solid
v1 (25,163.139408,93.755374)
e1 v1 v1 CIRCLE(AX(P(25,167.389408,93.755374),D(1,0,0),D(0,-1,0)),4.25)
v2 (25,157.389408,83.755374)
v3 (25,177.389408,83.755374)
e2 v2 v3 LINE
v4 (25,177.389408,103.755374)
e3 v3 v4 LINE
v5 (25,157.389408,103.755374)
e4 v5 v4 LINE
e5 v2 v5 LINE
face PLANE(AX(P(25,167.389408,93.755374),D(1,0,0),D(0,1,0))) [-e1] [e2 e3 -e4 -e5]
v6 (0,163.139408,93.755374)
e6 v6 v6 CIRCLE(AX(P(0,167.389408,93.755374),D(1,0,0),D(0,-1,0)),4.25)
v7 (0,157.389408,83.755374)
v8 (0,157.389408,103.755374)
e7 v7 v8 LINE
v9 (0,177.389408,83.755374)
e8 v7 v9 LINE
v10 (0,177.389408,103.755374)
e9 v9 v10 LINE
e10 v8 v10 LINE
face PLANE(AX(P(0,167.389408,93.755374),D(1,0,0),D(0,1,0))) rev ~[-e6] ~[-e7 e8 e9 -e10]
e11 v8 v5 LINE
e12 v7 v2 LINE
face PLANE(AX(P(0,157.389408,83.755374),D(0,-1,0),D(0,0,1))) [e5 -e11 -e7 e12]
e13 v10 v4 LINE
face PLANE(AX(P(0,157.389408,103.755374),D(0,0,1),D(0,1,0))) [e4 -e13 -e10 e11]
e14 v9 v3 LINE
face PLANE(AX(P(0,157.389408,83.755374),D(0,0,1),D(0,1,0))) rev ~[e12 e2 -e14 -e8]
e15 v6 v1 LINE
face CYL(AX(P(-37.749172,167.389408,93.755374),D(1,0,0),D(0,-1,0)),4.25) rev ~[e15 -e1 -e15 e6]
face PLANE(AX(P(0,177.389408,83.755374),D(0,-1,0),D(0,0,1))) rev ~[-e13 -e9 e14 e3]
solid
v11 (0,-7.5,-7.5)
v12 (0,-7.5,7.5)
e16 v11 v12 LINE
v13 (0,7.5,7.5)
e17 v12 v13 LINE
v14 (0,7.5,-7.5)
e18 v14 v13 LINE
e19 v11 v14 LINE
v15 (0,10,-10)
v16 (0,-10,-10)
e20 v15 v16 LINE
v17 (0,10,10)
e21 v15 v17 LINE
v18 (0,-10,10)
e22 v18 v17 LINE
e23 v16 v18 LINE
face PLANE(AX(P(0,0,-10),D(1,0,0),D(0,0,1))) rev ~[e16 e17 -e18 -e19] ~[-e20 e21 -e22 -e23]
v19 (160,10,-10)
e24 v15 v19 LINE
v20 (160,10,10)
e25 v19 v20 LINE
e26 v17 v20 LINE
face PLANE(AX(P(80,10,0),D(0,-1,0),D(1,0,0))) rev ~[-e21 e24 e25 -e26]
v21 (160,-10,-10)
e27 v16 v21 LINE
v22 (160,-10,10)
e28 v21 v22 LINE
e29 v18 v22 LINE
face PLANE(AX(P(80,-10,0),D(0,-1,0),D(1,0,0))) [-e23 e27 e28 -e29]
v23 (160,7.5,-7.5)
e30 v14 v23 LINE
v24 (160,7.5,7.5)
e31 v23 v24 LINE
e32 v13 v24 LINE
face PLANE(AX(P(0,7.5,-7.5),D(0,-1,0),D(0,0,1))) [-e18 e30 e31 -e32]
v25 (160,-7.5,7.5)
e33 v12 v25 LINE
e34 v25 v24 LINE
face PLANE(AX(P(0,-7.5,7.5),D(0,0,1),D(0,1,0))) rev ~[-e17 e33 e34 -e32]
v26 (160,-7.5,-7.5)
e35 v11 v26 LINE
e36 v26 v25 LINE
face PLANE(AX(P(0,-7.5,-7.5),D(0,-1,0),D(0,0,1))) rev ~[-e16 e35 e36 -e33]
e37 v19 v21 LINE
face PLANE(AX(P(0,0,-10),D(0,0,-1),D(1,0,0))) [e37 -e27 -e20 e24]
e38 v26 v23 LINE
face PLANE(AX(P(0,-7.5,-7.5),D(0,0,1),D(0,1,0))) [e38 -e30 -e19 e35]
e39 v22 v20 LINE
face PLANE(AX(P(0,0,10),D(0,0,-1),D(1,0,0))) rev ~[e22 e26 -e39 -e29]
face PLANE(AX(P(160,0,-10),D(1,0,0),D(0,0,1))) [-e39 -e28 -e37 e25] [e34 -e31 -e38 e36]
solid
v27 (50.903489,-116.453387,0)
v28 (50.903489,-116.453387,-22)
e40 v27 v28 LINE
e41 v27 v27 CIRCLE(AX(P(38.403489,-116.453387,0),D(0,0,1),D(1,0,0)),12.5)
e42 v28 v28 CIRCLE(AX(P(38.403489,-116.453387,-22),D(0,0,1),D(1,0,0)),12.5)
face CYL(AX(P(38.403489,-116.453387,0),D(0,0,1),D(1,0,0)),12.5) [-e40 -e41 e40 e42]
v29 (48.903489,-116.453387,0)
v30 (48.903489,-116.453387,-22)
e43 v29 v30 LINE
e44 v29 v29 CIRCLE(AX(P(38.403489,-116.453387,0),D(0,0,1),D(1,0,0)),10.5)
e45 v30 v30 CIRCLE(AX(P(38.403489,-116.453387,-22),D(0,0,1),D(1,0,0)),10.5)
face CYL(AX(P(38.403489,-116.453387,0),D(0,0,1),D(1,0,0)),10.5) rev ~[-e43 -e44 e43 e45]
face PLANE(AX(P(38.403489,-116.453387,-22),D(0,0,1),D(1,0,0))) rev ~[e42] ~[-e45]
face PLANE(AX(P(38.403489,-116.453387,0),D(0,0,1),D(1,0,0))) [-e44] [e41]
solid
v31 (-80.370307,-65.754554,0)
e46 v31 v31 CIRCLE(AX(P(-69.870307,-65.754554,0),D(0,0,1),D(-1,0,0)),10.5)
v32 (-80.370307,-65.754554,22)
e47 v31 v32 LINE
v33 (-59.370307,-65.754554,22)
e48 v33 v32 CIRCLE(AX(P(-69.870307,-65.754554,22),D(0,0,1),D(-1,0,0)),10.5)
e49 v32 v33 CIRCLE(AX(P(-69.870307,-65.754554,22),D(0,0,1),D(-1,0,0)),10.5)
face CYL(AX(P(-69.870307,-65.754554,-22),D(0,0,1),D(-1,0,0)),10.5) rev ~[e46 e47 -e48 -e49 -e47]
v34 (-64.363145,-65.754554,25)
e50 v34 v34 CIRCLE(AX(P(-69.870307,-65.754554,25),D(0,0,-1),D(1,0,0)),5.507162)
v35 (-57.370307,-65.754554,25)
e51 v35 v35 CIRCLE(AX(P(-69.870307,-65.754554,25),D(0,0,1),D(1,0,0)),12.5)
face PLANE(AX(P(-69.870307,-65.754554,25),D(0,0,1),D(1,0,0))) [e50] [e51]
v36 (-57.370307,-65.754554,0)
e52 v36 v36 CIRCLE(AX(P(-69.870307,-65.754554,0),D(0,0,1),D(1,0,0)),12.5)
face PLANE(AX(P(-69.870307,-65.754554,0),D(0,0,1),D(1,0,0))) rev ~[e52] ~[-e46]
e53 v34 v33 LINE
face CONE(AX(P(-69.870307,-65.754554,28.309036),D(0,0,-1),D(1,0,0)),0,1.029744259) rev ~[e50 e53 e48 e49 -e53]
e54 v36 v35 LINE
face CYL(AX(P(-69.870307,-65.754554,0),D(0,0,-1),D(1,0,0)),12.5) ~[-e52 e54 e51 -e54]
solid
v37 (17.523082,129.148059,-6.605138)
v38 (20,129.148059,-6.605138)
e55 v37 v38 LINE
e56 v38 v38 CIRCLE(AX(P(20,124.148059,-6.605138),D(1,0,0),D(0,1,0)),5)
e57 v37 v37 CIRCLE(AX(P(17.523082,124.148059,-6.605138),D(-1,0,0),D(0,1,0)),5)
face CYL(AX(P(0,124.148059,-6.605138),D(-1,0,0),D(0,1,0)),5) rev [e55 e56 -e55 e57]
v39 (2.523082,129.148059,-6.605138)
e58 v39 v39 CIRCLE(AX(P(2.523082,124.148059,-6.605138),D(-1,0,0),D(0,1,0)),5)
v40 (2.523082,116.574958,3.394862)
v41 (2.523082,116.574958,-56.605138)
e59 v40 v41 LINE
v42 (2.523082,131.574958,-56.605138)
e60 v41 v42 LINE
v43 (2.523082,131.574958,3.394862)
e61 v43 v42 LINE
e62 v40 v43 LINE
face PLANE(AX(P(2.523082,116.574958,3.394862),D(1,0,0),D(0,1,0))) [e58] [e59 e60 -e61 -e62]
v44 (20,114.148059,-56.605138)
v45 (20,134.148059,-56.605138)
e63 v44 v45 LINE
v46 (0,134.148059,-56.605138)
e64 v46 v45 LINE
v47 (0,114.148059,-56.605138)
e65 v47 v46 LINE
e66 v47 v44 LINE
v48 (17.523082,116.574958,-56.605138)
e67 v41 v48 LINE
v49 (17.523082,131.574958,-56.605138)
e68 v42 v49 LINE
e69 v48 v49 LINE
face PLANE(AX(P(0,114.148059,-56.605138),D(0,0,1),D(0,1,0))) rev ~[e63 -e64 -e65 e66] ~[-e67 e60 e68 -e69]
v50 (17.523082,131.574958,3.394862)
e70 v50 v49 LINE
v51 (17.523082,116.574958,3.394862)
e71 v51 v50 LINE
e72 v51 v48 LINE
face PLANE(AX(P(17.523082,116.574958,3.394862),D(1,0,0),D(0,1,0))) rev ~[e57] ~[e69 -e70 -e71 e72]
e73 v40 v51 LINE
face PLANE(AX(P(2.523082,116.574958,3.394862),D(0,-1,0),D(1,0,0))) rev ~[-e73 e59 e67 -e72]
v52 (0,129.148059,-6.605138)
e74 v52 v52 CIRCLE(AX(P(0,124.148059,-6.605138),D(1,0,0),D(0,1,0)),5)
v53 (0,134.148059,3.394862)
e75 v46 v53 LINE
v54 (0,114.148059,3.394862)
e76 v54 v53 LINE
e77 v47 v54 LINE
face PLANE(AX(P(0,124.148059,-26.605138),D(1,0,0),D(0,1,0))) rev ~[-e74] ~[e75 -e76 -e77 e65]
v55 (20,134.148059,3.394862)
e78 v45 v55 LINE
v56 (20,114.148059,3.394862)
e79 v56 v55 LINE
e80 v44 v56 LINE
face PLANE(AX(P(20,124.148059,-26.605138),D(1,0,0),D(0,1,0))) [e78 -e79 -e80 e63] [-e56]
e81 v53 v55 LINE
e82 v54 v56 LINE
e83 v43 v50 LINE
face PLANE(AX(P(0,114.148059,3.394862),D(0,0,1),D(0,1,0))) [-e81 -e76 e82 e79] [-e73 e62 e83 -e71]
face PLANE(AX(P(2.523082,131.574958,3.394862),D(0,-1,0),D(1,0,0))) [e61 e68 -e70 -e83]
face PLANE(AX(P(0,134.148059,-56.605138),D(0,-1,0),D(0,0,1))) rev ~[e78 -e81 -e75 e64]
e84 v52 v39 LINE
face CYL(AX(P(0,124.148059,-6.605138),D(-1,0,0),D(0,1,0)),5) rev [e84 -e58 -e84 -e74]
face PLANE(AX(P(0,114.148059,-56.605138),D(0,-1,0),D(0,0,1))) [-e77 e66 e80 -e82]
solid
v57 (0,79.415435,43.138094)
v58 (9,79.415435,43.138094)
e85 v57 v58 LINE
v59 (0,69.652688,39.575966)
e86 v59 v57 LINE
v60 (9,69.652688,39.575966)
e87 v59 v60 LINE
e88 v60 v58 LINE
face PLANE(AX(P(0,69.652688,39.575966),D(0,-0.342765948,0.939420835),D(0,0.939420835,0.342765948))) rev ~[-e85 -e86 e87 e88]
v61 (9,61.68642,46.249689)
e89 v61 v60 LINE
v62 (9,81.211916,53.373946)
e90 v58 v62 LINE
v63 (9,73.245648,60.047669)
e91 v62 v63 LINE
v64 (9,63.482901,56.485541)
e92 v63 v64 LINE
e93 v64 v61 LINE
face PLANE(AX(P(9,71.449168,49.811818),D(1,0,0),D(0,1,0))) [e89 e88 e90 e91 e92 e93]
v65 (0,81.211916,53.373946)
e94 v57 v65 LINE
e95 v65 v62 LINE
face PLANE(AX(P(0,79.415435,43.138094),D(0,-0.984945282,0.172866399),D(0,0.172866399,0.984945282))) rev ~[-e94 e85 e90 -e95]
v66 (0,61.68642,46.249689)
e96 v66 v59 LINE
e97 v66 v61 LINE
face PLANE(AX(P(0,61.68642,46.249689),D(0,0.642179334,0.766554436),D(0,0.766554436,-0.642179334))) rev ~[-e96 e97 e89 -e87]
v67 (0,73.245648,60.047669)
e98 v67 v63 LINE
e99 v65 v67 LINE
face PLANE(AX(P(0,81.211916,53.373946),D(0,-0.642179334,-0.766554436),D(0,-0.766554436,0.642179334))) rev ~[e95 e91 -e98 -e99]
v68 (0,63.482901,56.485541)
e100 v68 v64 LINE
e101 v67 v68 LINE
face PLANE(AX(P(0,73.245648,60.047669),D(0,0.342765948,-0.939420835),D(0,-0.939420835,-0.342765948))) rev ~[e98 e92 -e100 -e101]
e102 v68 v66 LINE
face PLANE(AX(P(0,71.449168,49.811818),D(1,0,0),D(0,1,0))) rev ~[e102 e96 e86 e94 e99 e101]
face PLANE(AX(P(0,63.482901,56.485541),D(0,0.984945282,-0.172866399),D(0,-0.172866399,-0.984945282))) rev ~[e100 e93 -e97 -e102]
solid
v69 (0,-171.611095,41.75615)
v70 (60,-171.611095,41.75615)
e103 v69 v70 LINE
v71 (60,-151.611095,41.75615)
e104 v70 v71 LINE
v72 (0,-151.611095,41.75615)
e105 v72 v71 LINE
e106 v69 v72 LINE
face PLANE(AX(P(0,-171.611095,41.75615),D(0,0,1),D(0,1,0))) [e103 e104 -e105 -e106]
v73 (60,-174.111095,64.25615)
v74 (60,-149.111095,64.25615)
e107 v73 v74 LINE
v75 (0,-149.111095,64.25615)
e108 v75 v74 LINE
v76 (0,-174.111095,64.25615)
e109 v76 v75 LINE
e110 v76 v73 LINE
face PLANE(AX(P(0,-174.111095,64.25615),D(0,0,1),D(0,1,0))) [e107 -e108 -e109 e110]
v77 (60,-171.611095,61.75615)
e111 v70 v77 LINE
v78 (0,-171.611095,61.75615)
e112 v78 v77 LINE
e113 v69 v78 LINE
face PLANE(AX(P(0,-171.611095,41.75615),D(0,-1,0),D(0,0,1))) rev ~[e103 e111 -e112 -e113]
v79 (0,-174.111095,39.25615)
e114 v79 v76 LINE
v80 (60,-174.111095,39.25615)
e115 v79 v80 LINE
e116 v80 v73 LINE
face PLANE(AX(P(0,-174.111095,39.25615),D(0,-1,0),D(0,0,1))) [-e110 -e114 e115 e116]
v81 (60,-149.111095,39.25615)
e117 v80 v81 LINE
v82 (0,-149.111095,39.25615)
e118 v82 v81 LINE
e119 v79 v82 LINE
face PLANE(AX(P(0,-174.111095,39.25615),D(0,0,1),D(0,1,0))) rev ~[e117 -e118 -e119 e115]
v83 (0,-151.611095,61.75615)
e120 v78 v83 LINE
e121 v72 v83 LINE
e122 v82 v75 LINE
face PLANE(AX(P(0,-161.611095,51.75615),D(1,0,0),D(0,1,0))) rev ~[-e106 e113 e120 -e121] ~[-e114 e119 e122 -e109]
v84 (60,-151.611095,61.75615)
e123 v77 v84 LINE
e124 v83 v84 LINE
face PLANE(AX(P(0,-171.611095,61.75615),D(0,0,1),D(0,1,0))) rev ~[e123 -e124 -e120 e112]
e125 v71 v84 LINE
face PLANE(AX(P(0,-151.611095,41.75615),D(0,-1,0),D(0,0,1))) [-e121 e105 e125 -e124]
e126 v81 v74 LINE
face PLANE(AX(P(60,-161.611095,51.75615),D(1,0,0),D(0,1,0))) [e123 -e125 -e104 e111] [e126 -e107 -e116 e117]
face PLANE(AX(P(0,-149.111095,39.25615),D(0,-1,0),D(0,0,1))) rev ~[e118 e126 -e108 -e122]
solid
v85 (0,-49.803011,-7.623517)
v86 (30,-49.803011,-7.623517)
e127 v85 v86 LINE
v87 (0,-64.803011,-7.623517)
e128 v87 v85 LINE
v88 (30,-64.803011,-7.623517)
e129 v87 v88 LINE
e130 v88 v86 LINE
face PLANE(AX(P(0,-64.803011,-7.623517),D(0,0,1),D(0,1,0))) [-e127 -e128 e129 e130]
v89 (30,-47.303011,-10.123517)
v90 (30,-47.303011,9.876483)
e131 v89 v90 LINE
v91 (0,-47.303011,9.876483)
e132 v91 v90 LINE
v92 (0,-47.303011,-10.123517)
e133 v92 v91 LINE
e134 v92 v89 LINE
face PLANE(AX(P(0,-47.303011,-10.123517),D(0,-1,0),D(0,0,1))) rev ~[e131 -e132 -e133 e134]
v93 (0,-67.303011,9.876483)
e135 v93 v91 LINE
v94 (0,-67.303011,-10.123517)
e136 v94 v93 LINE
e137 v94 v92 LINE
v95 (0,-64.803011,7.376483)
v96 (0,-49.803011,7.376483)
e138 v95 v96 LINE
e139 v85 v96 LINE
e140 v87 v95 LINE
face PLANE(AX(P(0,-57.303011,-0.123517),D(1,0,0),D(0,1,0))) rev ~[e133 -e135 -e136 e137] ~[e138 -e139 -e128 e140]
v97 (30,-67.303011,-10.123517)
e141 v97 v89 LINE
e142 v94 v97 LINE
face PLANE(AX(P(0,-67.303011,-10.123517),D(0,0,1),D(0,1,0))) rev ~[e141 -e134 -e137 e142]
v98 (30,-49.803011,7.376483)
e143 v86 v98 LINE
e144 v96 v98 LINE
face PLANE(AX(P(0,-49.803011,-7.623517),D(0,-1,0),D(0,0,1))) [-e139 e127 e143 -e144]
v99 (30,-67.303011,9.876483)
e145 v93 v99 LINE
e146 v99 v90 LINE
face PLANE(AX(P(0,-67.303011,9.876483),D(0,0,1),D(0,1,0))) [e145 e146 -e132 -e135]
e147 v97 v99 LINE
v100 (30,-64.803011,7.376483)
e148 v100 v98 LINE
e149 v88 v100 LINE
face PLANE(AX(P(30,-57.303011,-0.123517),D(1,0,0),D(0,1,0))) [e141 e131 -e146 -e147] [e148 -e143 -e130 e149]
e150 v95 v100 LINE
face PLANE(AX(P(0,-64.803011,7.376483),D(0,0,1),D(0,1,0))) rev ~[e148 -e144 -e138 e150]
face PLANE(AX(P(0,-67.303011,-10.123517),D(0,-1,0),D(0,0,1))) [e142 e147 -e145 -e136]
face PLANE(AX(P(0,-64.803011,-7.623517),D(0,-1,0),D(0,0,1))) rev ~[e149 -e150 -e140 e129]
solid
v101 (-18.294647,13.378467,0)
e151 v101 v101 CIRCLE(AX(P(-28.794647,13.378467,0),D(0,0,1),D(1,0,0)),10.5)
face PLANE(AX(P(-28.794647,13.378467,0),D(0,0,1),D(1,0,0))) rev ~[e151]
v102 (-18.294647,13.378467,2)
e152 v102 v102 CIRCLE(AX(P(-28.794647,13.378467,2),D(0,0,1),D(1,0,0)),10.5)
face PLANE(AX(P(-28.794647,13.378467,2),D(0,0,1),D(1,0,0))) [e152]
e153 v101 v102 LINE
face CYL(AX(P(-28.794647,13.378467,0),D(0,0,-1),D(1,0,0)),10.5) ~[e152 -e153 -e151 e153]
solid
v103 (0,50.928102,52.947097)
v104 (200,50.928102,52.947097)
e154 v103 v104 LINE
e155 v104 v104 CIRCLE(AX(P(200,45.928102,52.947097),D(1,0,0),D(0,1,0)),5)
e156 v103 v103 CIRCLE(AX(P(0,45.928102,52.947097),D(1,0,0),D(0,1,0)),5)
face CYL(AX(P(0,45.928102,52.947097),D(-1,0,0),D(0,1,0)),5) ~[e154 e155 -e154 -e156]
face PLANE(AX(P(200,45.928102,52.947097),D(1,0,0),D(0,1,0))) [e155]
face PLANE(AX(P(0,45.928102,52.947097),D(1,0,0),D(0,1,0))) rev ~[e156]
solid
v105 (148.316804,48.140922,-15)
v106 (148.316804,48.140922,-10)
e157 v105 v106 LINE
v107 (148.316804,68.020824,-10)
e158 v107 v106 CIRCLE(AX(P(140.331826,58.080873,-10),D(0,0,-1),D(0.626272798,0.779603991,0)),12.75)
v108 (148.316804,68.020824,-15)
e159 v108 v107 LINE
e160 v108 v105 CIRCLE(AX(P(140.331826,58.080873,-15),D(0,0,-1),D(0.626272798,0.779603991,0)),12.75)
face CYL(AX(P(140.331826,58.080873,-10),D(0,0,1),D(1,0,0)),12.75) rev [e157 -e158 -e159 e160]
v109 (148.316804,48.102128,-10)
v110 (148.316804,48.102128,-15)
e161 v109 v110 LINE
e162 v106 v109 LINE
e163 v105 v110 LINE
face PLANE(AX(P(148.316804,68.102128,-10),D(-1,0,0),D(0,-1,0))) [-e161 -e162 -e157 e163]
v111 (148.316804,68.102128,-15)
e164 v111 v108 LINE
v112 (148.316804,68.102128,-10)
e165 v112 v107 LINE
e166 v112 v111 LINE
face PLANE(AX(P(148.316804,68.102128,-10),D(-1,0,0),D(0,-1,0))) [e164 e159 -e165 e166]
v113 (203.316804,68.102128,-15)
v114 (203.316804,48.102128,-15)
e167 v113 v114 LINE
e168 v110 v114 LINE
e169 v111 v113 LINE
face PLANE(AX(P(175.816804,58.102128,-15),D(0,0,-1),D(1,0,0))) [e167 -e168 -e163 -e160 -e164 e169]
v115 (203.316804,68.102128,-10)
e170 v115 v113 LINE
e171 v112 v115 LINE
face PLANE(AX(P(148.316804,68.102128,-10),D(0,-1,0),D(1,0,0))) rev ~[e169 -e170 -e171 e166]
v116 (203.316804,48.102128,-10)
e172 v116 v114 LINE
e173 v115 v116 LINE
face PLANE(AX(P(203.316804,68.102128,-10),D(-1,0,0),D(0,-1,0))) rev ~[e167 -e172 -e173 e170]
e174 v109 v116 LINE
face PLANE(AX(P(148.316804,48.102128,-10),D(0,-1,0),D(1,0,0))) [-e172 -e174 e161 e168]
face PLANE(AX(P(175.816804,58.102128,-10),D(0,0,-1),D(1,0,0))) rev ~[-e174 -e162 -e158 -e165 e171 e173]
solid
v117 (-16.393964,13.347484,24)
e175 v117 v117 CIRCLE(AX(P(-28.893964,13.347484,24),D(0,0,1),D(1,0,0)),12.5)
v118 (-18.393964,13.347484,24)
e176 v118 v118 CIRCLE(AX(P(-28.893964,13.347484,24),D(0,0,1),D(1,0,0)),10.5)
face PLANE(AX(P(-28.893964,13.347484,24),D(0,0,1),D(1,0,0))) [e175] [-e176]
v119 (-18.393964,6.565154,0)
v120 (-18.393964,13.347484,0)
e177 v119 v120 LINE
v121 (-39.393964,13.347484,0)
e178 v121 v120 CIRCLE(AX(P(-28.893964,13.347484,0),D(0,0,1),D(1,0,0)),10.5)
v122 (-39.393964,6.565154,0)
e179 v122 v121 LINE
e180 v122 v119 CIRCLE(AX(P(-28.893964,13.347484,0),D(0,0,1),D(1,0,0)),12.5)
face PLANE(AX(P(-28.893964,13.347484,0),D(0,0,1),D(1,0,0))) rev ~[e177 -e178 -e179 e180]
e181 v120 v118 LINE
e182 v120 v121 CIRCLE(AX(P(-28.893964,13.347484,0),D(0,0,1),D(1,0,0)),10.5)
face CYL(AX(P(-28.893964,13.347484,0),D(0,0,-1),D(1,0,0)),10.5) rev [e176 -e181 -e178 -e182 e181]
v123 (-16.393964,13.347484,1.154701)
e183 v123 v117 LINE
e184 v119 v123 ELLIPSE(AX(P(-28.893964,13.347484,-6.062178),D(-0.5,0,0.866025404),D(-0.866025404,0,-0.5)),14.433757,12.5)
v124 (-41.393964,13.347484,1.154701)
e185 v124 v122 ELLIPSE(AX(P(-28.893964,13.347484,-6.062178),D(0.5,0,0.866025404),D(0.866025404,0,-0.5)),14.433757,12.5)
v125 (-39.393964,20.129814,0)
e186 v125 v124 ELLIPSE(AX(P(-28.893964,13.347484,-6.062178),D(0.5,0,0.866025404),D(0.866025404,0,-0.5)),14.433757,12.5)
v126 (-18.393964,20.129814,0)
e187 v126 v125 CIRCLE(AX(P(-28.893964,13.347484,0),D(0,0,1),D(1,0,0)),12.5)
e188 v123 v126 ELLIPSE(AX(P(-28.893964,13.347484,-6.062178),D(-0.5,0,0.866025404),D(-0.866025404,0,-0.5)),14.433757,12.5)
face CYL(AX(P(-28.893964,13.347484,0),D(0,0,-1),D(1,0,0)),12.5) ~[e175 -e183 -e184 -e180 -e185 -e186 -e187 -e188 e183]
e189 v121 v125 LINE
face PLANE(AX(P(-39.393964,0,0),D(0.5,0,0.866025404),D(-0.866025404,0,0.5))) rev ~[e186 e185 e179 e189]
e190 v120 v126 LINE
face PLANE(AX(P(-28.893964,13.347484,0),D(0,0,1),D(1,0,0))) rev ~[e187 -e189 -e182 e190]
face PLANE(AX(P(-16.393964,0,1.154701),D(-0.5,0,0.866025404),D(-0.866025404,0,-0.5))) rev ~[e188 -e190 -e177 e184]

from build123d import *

# Parameters (mm, degrees)
F0_W      = 160
F0_H      = 20
F1_DEPTH  = 10
F2_W      = 25
F2_H      = 25
F2_W_2    = 20
F2_H_2    = 20
F3_DEPTH  = 60
F4_W      = 15
F4_H      = 15
F5_DEPTH  = 160
F6_W      = 20
F6_H      = 20
F6_W_2    = 15
F6_H_2    = 15
F7_DEPTH  = 30
F8_R      = 12.5
F8_R_2    = 10.5
F9_DEPTH  = 22
F10_R     = 12.5
F10_R_2   = 10.5
F11_DEPTH = 24
F12_R     = 12.5
F13_DEPTH = 25
F14_D     = 21
F14_DEPTH = 22
F14_TIP   = 6.3090364998
F15_W     = 55
F15_H     = 20
F16_DEPTH = 5
F17_W     = 20
F17_H     = 60
F17_R     = 5
F18_DEPTH = 20
F19_W     = 20
F19_H     = 20
F20_DEPTH = 25
F21_D     = 8.5
F22_R     = 5
F23_DEPTH = 200
F25_DEPTH = 9
F27_DEPTH = 25
F29_DEPTH = 25
F30_R     = 10.5
F31_DEPTH = 2
F32_W     = 15
F32_H     = 15
F33_DEPTH = 60
F34_R     = 12.75
F35_DEPTH = 5


# Not quite as in the source:
# - a feature names something its author has since deleted; it is built from what else it names


with BuildPart() as f1:
    # F0 (on Front) → F1 (new body, symmetric)
    with BuildSketch(Plane.XZ):
        with Locations((80, 0)):
            Rectangle(F0_W, F0_H)
    extrude(amount=F1_DEPTH, both=True)

    # F4 (on Right) → F5 (cut)
    with BuildSketch(Plane.YZ):
        Rectangle(F4_W, F4_H)
    extrude(amount=F5_DEPTH, mode=Mode.SUBTRACT)


with BuildPart() as f3:
    # F2 (on Right) → F3 (new body)
    with BuildSketch(Plane.YZ):
        with Locations((-161.6110950708, 51.756149815)):
            Rectangle(F2_W, F2_H)
        with Locations((-161.6110950708, 51.756149815)):
            Rectangle(F2_W_2, F2_H_2, mode=Mode.SUBTRACT)
    extrude(amount=F3_DEPTH)


with BuildPart() as f7:
    # F6 (on Right) → F7 (new body)
    with BuildSketch(Plane.YZ):
        with Locations((-57.3030114174, -0.1235169003)):
            Rectangle(F6_W, F6_H)
        with Locations((-57.3030114174, -0.1235169003)):
            Rectangle(F6_W_2, F6_H_2, mode=Mode.SUBTRACT)
    extrude(amount=F7_DEPTH)


with BuildPart() as f9:
    # F8 (on Top) → F9 (new body)
    with BuildSketch(Plane.XY):
        with Locations((38.4034886956, -116.4533868432)):
            Circle(F8_R)
        with Locations((38.4034886956, -116.4533868432)):
            Circle(F8_R_2, mode=Mode.SUBTRACT)
    extrude(amount=-F9_DEPTH)


with BuildPart() as f11:
    # F10 (on Top) → F11 (new body)
    with BuildSketch(Plane.XY):
        with Locations((-28.8939643651, 13.3474841714)):
            Circle(F10_R)
        with Locations((-28.8939643651, 13.3474841714)):
            Circle(F10_R_2, mode=Mode.SUBTRACT)
    extrude(amount=F11_DEPTH)

    # F26 (on Front) → F27 (cut)
    with BuildSketch(Plane.XZ):
        Polygon((-18.3939643651, 0), (-16.3939643651, 0), (-16.3939643651, 1.1547005384), align=None)
    extrude(amount=-F27_DEPTH, mode=Mode.SUBTRACT)

    # F28 (on Front) → F29 (cut)
    with BuildSketch(Plane.XZ):
        Polygon((-41.3939643651, 1.1547005384), (-41.3939643651, 0), (-39.3939643651, 0), align=None)
    extrude(amount=-F29_DEPTH, mode=Mode.SUBTRACT)


with BuildPart() as f13:
    # F12 (on Top) → F13 (new body)
    with BuildSketch(Plane.XY):
        with Locations((-69.8703065715, -65.7545542214)):
            Circle(F12_R)
    extrude(amount=F13_DEPTH)

    # F14
    with Locations(Plane(origin=(0, 0, 0), x_dir=(1, 0, 0), z_dir=(0, 0, -1))):
        with Locations((-69.8703065715, 65.7545542214)):
            Hole(F14_D / 2, depth=F14_DEPTH)
            with Locations((0, 0, -(F14_DEPTH + F14_TIP / 2))):  # 118° drill point
                Cone(0, F14_D / 2, F14_TIP, mode=Mode.SUBTRACT)


with BuildPart() as f16:
    # F15 (on face) → F16 (new body)
    with BuildSketch(Plane(origin=(0, 0, -10), x_dir=(1, 0, 0), z_dir=(0, 0, -1))):
        with Locations((175.8168041706, -58.102128388)):
            Rectangle(F15_W, F15_H)
    extrude(amount=F16_DEPTH)

    # F34 (on face) → F35 (cut)
    with BuildSketch(Plane(origin=(0, 0, -10), x_dir=(1, 0, 0), z_dir=(0, 0, -1))):
        with Locations((140.3318259962, -58.0808729371)):
            Circle(F34_R)
    extrude(amount=F35_DEPTH, mode=Mode.SUBTRACT)


with BuildPart() as f18:
    # F17 (on Right) → F18 (new body)
    with BuildSketch(Plane.YZ):
        with Locations((124.1480589582, -26.6051380336)):
            Rectangle(F17_W, F17_H)
        with Locations((124.1480589582, -6.6051380336)):
            Circle(F17_R, mode=Mode.SUBTRACT)
    extrude(amount=F18_DEPTH)

    # F32 (on face) → F33 (cut)
    with BuildSketch(Plane.XY.offset(3.3948619664)):
        with Locations((10.0230817938, 124.0749582648)):
            Rectangle(F32_W, F32_H)
    extrude(amount=-F33_DEPTH, mode=Mode.SUBTRACT)


with BuildPart() as f20:
    # F19 (on Right) → F20 (new body)
    with BuildSketch(Plane.YZ):
        with Locations((167.3894077539, 93.7553744961)):
            Rectangle(F19_W, F19_H)
    extrude(amount=F20_DEPTH)

    # F21 (through all)
    with Locations(Plane(origin=(0, 0, 0), x_dir=(0, 1, 0), z_dir=(-1, 0, 0))):
        with Locations((167.3894077539, -93.7553744961)):
            Hole(F21_D / 2)


with BuildPart() as f23:
    # F22 (on Right) → F23 (new body)
    with BuildSketch(Plane.YZ):
        with Locations((45.9281019866, 52.9470965266)):
            Circle(F22_R)
    extrude(amount=F23_DEPTH)


with BuildPart() as f25:
    # F24 (on Right) → F25 (new body)
    with BuildSketch(Plane.YZ):
        Polygon((79.4154354066, 43.138094305), (81.2119157193, 53.3739459299), (73.2456483392, 60.0476693305), (63.4829006463, 56.4855411063), (61.6864203336, 46.2496894814), (69.6526877137, 39.5759660808), align=None)
    extrude(amount=F25_DEPTH)


with BuildPart() as f31:
    # F30 (on Top) → F31 (new body)
    with BuildSketch(Plane.XY):
        with Locations((-28.7946469224, 13.378466991)):
            Circle(F30_R)
    extrude(amount=F31_DEPTH)


solid = Compound([f1.part, f3.part, f7.part, f9.part, f11.part, f13.part, f16.part, f18.part, f20.part, f23.part, f25.part, f31.part])
